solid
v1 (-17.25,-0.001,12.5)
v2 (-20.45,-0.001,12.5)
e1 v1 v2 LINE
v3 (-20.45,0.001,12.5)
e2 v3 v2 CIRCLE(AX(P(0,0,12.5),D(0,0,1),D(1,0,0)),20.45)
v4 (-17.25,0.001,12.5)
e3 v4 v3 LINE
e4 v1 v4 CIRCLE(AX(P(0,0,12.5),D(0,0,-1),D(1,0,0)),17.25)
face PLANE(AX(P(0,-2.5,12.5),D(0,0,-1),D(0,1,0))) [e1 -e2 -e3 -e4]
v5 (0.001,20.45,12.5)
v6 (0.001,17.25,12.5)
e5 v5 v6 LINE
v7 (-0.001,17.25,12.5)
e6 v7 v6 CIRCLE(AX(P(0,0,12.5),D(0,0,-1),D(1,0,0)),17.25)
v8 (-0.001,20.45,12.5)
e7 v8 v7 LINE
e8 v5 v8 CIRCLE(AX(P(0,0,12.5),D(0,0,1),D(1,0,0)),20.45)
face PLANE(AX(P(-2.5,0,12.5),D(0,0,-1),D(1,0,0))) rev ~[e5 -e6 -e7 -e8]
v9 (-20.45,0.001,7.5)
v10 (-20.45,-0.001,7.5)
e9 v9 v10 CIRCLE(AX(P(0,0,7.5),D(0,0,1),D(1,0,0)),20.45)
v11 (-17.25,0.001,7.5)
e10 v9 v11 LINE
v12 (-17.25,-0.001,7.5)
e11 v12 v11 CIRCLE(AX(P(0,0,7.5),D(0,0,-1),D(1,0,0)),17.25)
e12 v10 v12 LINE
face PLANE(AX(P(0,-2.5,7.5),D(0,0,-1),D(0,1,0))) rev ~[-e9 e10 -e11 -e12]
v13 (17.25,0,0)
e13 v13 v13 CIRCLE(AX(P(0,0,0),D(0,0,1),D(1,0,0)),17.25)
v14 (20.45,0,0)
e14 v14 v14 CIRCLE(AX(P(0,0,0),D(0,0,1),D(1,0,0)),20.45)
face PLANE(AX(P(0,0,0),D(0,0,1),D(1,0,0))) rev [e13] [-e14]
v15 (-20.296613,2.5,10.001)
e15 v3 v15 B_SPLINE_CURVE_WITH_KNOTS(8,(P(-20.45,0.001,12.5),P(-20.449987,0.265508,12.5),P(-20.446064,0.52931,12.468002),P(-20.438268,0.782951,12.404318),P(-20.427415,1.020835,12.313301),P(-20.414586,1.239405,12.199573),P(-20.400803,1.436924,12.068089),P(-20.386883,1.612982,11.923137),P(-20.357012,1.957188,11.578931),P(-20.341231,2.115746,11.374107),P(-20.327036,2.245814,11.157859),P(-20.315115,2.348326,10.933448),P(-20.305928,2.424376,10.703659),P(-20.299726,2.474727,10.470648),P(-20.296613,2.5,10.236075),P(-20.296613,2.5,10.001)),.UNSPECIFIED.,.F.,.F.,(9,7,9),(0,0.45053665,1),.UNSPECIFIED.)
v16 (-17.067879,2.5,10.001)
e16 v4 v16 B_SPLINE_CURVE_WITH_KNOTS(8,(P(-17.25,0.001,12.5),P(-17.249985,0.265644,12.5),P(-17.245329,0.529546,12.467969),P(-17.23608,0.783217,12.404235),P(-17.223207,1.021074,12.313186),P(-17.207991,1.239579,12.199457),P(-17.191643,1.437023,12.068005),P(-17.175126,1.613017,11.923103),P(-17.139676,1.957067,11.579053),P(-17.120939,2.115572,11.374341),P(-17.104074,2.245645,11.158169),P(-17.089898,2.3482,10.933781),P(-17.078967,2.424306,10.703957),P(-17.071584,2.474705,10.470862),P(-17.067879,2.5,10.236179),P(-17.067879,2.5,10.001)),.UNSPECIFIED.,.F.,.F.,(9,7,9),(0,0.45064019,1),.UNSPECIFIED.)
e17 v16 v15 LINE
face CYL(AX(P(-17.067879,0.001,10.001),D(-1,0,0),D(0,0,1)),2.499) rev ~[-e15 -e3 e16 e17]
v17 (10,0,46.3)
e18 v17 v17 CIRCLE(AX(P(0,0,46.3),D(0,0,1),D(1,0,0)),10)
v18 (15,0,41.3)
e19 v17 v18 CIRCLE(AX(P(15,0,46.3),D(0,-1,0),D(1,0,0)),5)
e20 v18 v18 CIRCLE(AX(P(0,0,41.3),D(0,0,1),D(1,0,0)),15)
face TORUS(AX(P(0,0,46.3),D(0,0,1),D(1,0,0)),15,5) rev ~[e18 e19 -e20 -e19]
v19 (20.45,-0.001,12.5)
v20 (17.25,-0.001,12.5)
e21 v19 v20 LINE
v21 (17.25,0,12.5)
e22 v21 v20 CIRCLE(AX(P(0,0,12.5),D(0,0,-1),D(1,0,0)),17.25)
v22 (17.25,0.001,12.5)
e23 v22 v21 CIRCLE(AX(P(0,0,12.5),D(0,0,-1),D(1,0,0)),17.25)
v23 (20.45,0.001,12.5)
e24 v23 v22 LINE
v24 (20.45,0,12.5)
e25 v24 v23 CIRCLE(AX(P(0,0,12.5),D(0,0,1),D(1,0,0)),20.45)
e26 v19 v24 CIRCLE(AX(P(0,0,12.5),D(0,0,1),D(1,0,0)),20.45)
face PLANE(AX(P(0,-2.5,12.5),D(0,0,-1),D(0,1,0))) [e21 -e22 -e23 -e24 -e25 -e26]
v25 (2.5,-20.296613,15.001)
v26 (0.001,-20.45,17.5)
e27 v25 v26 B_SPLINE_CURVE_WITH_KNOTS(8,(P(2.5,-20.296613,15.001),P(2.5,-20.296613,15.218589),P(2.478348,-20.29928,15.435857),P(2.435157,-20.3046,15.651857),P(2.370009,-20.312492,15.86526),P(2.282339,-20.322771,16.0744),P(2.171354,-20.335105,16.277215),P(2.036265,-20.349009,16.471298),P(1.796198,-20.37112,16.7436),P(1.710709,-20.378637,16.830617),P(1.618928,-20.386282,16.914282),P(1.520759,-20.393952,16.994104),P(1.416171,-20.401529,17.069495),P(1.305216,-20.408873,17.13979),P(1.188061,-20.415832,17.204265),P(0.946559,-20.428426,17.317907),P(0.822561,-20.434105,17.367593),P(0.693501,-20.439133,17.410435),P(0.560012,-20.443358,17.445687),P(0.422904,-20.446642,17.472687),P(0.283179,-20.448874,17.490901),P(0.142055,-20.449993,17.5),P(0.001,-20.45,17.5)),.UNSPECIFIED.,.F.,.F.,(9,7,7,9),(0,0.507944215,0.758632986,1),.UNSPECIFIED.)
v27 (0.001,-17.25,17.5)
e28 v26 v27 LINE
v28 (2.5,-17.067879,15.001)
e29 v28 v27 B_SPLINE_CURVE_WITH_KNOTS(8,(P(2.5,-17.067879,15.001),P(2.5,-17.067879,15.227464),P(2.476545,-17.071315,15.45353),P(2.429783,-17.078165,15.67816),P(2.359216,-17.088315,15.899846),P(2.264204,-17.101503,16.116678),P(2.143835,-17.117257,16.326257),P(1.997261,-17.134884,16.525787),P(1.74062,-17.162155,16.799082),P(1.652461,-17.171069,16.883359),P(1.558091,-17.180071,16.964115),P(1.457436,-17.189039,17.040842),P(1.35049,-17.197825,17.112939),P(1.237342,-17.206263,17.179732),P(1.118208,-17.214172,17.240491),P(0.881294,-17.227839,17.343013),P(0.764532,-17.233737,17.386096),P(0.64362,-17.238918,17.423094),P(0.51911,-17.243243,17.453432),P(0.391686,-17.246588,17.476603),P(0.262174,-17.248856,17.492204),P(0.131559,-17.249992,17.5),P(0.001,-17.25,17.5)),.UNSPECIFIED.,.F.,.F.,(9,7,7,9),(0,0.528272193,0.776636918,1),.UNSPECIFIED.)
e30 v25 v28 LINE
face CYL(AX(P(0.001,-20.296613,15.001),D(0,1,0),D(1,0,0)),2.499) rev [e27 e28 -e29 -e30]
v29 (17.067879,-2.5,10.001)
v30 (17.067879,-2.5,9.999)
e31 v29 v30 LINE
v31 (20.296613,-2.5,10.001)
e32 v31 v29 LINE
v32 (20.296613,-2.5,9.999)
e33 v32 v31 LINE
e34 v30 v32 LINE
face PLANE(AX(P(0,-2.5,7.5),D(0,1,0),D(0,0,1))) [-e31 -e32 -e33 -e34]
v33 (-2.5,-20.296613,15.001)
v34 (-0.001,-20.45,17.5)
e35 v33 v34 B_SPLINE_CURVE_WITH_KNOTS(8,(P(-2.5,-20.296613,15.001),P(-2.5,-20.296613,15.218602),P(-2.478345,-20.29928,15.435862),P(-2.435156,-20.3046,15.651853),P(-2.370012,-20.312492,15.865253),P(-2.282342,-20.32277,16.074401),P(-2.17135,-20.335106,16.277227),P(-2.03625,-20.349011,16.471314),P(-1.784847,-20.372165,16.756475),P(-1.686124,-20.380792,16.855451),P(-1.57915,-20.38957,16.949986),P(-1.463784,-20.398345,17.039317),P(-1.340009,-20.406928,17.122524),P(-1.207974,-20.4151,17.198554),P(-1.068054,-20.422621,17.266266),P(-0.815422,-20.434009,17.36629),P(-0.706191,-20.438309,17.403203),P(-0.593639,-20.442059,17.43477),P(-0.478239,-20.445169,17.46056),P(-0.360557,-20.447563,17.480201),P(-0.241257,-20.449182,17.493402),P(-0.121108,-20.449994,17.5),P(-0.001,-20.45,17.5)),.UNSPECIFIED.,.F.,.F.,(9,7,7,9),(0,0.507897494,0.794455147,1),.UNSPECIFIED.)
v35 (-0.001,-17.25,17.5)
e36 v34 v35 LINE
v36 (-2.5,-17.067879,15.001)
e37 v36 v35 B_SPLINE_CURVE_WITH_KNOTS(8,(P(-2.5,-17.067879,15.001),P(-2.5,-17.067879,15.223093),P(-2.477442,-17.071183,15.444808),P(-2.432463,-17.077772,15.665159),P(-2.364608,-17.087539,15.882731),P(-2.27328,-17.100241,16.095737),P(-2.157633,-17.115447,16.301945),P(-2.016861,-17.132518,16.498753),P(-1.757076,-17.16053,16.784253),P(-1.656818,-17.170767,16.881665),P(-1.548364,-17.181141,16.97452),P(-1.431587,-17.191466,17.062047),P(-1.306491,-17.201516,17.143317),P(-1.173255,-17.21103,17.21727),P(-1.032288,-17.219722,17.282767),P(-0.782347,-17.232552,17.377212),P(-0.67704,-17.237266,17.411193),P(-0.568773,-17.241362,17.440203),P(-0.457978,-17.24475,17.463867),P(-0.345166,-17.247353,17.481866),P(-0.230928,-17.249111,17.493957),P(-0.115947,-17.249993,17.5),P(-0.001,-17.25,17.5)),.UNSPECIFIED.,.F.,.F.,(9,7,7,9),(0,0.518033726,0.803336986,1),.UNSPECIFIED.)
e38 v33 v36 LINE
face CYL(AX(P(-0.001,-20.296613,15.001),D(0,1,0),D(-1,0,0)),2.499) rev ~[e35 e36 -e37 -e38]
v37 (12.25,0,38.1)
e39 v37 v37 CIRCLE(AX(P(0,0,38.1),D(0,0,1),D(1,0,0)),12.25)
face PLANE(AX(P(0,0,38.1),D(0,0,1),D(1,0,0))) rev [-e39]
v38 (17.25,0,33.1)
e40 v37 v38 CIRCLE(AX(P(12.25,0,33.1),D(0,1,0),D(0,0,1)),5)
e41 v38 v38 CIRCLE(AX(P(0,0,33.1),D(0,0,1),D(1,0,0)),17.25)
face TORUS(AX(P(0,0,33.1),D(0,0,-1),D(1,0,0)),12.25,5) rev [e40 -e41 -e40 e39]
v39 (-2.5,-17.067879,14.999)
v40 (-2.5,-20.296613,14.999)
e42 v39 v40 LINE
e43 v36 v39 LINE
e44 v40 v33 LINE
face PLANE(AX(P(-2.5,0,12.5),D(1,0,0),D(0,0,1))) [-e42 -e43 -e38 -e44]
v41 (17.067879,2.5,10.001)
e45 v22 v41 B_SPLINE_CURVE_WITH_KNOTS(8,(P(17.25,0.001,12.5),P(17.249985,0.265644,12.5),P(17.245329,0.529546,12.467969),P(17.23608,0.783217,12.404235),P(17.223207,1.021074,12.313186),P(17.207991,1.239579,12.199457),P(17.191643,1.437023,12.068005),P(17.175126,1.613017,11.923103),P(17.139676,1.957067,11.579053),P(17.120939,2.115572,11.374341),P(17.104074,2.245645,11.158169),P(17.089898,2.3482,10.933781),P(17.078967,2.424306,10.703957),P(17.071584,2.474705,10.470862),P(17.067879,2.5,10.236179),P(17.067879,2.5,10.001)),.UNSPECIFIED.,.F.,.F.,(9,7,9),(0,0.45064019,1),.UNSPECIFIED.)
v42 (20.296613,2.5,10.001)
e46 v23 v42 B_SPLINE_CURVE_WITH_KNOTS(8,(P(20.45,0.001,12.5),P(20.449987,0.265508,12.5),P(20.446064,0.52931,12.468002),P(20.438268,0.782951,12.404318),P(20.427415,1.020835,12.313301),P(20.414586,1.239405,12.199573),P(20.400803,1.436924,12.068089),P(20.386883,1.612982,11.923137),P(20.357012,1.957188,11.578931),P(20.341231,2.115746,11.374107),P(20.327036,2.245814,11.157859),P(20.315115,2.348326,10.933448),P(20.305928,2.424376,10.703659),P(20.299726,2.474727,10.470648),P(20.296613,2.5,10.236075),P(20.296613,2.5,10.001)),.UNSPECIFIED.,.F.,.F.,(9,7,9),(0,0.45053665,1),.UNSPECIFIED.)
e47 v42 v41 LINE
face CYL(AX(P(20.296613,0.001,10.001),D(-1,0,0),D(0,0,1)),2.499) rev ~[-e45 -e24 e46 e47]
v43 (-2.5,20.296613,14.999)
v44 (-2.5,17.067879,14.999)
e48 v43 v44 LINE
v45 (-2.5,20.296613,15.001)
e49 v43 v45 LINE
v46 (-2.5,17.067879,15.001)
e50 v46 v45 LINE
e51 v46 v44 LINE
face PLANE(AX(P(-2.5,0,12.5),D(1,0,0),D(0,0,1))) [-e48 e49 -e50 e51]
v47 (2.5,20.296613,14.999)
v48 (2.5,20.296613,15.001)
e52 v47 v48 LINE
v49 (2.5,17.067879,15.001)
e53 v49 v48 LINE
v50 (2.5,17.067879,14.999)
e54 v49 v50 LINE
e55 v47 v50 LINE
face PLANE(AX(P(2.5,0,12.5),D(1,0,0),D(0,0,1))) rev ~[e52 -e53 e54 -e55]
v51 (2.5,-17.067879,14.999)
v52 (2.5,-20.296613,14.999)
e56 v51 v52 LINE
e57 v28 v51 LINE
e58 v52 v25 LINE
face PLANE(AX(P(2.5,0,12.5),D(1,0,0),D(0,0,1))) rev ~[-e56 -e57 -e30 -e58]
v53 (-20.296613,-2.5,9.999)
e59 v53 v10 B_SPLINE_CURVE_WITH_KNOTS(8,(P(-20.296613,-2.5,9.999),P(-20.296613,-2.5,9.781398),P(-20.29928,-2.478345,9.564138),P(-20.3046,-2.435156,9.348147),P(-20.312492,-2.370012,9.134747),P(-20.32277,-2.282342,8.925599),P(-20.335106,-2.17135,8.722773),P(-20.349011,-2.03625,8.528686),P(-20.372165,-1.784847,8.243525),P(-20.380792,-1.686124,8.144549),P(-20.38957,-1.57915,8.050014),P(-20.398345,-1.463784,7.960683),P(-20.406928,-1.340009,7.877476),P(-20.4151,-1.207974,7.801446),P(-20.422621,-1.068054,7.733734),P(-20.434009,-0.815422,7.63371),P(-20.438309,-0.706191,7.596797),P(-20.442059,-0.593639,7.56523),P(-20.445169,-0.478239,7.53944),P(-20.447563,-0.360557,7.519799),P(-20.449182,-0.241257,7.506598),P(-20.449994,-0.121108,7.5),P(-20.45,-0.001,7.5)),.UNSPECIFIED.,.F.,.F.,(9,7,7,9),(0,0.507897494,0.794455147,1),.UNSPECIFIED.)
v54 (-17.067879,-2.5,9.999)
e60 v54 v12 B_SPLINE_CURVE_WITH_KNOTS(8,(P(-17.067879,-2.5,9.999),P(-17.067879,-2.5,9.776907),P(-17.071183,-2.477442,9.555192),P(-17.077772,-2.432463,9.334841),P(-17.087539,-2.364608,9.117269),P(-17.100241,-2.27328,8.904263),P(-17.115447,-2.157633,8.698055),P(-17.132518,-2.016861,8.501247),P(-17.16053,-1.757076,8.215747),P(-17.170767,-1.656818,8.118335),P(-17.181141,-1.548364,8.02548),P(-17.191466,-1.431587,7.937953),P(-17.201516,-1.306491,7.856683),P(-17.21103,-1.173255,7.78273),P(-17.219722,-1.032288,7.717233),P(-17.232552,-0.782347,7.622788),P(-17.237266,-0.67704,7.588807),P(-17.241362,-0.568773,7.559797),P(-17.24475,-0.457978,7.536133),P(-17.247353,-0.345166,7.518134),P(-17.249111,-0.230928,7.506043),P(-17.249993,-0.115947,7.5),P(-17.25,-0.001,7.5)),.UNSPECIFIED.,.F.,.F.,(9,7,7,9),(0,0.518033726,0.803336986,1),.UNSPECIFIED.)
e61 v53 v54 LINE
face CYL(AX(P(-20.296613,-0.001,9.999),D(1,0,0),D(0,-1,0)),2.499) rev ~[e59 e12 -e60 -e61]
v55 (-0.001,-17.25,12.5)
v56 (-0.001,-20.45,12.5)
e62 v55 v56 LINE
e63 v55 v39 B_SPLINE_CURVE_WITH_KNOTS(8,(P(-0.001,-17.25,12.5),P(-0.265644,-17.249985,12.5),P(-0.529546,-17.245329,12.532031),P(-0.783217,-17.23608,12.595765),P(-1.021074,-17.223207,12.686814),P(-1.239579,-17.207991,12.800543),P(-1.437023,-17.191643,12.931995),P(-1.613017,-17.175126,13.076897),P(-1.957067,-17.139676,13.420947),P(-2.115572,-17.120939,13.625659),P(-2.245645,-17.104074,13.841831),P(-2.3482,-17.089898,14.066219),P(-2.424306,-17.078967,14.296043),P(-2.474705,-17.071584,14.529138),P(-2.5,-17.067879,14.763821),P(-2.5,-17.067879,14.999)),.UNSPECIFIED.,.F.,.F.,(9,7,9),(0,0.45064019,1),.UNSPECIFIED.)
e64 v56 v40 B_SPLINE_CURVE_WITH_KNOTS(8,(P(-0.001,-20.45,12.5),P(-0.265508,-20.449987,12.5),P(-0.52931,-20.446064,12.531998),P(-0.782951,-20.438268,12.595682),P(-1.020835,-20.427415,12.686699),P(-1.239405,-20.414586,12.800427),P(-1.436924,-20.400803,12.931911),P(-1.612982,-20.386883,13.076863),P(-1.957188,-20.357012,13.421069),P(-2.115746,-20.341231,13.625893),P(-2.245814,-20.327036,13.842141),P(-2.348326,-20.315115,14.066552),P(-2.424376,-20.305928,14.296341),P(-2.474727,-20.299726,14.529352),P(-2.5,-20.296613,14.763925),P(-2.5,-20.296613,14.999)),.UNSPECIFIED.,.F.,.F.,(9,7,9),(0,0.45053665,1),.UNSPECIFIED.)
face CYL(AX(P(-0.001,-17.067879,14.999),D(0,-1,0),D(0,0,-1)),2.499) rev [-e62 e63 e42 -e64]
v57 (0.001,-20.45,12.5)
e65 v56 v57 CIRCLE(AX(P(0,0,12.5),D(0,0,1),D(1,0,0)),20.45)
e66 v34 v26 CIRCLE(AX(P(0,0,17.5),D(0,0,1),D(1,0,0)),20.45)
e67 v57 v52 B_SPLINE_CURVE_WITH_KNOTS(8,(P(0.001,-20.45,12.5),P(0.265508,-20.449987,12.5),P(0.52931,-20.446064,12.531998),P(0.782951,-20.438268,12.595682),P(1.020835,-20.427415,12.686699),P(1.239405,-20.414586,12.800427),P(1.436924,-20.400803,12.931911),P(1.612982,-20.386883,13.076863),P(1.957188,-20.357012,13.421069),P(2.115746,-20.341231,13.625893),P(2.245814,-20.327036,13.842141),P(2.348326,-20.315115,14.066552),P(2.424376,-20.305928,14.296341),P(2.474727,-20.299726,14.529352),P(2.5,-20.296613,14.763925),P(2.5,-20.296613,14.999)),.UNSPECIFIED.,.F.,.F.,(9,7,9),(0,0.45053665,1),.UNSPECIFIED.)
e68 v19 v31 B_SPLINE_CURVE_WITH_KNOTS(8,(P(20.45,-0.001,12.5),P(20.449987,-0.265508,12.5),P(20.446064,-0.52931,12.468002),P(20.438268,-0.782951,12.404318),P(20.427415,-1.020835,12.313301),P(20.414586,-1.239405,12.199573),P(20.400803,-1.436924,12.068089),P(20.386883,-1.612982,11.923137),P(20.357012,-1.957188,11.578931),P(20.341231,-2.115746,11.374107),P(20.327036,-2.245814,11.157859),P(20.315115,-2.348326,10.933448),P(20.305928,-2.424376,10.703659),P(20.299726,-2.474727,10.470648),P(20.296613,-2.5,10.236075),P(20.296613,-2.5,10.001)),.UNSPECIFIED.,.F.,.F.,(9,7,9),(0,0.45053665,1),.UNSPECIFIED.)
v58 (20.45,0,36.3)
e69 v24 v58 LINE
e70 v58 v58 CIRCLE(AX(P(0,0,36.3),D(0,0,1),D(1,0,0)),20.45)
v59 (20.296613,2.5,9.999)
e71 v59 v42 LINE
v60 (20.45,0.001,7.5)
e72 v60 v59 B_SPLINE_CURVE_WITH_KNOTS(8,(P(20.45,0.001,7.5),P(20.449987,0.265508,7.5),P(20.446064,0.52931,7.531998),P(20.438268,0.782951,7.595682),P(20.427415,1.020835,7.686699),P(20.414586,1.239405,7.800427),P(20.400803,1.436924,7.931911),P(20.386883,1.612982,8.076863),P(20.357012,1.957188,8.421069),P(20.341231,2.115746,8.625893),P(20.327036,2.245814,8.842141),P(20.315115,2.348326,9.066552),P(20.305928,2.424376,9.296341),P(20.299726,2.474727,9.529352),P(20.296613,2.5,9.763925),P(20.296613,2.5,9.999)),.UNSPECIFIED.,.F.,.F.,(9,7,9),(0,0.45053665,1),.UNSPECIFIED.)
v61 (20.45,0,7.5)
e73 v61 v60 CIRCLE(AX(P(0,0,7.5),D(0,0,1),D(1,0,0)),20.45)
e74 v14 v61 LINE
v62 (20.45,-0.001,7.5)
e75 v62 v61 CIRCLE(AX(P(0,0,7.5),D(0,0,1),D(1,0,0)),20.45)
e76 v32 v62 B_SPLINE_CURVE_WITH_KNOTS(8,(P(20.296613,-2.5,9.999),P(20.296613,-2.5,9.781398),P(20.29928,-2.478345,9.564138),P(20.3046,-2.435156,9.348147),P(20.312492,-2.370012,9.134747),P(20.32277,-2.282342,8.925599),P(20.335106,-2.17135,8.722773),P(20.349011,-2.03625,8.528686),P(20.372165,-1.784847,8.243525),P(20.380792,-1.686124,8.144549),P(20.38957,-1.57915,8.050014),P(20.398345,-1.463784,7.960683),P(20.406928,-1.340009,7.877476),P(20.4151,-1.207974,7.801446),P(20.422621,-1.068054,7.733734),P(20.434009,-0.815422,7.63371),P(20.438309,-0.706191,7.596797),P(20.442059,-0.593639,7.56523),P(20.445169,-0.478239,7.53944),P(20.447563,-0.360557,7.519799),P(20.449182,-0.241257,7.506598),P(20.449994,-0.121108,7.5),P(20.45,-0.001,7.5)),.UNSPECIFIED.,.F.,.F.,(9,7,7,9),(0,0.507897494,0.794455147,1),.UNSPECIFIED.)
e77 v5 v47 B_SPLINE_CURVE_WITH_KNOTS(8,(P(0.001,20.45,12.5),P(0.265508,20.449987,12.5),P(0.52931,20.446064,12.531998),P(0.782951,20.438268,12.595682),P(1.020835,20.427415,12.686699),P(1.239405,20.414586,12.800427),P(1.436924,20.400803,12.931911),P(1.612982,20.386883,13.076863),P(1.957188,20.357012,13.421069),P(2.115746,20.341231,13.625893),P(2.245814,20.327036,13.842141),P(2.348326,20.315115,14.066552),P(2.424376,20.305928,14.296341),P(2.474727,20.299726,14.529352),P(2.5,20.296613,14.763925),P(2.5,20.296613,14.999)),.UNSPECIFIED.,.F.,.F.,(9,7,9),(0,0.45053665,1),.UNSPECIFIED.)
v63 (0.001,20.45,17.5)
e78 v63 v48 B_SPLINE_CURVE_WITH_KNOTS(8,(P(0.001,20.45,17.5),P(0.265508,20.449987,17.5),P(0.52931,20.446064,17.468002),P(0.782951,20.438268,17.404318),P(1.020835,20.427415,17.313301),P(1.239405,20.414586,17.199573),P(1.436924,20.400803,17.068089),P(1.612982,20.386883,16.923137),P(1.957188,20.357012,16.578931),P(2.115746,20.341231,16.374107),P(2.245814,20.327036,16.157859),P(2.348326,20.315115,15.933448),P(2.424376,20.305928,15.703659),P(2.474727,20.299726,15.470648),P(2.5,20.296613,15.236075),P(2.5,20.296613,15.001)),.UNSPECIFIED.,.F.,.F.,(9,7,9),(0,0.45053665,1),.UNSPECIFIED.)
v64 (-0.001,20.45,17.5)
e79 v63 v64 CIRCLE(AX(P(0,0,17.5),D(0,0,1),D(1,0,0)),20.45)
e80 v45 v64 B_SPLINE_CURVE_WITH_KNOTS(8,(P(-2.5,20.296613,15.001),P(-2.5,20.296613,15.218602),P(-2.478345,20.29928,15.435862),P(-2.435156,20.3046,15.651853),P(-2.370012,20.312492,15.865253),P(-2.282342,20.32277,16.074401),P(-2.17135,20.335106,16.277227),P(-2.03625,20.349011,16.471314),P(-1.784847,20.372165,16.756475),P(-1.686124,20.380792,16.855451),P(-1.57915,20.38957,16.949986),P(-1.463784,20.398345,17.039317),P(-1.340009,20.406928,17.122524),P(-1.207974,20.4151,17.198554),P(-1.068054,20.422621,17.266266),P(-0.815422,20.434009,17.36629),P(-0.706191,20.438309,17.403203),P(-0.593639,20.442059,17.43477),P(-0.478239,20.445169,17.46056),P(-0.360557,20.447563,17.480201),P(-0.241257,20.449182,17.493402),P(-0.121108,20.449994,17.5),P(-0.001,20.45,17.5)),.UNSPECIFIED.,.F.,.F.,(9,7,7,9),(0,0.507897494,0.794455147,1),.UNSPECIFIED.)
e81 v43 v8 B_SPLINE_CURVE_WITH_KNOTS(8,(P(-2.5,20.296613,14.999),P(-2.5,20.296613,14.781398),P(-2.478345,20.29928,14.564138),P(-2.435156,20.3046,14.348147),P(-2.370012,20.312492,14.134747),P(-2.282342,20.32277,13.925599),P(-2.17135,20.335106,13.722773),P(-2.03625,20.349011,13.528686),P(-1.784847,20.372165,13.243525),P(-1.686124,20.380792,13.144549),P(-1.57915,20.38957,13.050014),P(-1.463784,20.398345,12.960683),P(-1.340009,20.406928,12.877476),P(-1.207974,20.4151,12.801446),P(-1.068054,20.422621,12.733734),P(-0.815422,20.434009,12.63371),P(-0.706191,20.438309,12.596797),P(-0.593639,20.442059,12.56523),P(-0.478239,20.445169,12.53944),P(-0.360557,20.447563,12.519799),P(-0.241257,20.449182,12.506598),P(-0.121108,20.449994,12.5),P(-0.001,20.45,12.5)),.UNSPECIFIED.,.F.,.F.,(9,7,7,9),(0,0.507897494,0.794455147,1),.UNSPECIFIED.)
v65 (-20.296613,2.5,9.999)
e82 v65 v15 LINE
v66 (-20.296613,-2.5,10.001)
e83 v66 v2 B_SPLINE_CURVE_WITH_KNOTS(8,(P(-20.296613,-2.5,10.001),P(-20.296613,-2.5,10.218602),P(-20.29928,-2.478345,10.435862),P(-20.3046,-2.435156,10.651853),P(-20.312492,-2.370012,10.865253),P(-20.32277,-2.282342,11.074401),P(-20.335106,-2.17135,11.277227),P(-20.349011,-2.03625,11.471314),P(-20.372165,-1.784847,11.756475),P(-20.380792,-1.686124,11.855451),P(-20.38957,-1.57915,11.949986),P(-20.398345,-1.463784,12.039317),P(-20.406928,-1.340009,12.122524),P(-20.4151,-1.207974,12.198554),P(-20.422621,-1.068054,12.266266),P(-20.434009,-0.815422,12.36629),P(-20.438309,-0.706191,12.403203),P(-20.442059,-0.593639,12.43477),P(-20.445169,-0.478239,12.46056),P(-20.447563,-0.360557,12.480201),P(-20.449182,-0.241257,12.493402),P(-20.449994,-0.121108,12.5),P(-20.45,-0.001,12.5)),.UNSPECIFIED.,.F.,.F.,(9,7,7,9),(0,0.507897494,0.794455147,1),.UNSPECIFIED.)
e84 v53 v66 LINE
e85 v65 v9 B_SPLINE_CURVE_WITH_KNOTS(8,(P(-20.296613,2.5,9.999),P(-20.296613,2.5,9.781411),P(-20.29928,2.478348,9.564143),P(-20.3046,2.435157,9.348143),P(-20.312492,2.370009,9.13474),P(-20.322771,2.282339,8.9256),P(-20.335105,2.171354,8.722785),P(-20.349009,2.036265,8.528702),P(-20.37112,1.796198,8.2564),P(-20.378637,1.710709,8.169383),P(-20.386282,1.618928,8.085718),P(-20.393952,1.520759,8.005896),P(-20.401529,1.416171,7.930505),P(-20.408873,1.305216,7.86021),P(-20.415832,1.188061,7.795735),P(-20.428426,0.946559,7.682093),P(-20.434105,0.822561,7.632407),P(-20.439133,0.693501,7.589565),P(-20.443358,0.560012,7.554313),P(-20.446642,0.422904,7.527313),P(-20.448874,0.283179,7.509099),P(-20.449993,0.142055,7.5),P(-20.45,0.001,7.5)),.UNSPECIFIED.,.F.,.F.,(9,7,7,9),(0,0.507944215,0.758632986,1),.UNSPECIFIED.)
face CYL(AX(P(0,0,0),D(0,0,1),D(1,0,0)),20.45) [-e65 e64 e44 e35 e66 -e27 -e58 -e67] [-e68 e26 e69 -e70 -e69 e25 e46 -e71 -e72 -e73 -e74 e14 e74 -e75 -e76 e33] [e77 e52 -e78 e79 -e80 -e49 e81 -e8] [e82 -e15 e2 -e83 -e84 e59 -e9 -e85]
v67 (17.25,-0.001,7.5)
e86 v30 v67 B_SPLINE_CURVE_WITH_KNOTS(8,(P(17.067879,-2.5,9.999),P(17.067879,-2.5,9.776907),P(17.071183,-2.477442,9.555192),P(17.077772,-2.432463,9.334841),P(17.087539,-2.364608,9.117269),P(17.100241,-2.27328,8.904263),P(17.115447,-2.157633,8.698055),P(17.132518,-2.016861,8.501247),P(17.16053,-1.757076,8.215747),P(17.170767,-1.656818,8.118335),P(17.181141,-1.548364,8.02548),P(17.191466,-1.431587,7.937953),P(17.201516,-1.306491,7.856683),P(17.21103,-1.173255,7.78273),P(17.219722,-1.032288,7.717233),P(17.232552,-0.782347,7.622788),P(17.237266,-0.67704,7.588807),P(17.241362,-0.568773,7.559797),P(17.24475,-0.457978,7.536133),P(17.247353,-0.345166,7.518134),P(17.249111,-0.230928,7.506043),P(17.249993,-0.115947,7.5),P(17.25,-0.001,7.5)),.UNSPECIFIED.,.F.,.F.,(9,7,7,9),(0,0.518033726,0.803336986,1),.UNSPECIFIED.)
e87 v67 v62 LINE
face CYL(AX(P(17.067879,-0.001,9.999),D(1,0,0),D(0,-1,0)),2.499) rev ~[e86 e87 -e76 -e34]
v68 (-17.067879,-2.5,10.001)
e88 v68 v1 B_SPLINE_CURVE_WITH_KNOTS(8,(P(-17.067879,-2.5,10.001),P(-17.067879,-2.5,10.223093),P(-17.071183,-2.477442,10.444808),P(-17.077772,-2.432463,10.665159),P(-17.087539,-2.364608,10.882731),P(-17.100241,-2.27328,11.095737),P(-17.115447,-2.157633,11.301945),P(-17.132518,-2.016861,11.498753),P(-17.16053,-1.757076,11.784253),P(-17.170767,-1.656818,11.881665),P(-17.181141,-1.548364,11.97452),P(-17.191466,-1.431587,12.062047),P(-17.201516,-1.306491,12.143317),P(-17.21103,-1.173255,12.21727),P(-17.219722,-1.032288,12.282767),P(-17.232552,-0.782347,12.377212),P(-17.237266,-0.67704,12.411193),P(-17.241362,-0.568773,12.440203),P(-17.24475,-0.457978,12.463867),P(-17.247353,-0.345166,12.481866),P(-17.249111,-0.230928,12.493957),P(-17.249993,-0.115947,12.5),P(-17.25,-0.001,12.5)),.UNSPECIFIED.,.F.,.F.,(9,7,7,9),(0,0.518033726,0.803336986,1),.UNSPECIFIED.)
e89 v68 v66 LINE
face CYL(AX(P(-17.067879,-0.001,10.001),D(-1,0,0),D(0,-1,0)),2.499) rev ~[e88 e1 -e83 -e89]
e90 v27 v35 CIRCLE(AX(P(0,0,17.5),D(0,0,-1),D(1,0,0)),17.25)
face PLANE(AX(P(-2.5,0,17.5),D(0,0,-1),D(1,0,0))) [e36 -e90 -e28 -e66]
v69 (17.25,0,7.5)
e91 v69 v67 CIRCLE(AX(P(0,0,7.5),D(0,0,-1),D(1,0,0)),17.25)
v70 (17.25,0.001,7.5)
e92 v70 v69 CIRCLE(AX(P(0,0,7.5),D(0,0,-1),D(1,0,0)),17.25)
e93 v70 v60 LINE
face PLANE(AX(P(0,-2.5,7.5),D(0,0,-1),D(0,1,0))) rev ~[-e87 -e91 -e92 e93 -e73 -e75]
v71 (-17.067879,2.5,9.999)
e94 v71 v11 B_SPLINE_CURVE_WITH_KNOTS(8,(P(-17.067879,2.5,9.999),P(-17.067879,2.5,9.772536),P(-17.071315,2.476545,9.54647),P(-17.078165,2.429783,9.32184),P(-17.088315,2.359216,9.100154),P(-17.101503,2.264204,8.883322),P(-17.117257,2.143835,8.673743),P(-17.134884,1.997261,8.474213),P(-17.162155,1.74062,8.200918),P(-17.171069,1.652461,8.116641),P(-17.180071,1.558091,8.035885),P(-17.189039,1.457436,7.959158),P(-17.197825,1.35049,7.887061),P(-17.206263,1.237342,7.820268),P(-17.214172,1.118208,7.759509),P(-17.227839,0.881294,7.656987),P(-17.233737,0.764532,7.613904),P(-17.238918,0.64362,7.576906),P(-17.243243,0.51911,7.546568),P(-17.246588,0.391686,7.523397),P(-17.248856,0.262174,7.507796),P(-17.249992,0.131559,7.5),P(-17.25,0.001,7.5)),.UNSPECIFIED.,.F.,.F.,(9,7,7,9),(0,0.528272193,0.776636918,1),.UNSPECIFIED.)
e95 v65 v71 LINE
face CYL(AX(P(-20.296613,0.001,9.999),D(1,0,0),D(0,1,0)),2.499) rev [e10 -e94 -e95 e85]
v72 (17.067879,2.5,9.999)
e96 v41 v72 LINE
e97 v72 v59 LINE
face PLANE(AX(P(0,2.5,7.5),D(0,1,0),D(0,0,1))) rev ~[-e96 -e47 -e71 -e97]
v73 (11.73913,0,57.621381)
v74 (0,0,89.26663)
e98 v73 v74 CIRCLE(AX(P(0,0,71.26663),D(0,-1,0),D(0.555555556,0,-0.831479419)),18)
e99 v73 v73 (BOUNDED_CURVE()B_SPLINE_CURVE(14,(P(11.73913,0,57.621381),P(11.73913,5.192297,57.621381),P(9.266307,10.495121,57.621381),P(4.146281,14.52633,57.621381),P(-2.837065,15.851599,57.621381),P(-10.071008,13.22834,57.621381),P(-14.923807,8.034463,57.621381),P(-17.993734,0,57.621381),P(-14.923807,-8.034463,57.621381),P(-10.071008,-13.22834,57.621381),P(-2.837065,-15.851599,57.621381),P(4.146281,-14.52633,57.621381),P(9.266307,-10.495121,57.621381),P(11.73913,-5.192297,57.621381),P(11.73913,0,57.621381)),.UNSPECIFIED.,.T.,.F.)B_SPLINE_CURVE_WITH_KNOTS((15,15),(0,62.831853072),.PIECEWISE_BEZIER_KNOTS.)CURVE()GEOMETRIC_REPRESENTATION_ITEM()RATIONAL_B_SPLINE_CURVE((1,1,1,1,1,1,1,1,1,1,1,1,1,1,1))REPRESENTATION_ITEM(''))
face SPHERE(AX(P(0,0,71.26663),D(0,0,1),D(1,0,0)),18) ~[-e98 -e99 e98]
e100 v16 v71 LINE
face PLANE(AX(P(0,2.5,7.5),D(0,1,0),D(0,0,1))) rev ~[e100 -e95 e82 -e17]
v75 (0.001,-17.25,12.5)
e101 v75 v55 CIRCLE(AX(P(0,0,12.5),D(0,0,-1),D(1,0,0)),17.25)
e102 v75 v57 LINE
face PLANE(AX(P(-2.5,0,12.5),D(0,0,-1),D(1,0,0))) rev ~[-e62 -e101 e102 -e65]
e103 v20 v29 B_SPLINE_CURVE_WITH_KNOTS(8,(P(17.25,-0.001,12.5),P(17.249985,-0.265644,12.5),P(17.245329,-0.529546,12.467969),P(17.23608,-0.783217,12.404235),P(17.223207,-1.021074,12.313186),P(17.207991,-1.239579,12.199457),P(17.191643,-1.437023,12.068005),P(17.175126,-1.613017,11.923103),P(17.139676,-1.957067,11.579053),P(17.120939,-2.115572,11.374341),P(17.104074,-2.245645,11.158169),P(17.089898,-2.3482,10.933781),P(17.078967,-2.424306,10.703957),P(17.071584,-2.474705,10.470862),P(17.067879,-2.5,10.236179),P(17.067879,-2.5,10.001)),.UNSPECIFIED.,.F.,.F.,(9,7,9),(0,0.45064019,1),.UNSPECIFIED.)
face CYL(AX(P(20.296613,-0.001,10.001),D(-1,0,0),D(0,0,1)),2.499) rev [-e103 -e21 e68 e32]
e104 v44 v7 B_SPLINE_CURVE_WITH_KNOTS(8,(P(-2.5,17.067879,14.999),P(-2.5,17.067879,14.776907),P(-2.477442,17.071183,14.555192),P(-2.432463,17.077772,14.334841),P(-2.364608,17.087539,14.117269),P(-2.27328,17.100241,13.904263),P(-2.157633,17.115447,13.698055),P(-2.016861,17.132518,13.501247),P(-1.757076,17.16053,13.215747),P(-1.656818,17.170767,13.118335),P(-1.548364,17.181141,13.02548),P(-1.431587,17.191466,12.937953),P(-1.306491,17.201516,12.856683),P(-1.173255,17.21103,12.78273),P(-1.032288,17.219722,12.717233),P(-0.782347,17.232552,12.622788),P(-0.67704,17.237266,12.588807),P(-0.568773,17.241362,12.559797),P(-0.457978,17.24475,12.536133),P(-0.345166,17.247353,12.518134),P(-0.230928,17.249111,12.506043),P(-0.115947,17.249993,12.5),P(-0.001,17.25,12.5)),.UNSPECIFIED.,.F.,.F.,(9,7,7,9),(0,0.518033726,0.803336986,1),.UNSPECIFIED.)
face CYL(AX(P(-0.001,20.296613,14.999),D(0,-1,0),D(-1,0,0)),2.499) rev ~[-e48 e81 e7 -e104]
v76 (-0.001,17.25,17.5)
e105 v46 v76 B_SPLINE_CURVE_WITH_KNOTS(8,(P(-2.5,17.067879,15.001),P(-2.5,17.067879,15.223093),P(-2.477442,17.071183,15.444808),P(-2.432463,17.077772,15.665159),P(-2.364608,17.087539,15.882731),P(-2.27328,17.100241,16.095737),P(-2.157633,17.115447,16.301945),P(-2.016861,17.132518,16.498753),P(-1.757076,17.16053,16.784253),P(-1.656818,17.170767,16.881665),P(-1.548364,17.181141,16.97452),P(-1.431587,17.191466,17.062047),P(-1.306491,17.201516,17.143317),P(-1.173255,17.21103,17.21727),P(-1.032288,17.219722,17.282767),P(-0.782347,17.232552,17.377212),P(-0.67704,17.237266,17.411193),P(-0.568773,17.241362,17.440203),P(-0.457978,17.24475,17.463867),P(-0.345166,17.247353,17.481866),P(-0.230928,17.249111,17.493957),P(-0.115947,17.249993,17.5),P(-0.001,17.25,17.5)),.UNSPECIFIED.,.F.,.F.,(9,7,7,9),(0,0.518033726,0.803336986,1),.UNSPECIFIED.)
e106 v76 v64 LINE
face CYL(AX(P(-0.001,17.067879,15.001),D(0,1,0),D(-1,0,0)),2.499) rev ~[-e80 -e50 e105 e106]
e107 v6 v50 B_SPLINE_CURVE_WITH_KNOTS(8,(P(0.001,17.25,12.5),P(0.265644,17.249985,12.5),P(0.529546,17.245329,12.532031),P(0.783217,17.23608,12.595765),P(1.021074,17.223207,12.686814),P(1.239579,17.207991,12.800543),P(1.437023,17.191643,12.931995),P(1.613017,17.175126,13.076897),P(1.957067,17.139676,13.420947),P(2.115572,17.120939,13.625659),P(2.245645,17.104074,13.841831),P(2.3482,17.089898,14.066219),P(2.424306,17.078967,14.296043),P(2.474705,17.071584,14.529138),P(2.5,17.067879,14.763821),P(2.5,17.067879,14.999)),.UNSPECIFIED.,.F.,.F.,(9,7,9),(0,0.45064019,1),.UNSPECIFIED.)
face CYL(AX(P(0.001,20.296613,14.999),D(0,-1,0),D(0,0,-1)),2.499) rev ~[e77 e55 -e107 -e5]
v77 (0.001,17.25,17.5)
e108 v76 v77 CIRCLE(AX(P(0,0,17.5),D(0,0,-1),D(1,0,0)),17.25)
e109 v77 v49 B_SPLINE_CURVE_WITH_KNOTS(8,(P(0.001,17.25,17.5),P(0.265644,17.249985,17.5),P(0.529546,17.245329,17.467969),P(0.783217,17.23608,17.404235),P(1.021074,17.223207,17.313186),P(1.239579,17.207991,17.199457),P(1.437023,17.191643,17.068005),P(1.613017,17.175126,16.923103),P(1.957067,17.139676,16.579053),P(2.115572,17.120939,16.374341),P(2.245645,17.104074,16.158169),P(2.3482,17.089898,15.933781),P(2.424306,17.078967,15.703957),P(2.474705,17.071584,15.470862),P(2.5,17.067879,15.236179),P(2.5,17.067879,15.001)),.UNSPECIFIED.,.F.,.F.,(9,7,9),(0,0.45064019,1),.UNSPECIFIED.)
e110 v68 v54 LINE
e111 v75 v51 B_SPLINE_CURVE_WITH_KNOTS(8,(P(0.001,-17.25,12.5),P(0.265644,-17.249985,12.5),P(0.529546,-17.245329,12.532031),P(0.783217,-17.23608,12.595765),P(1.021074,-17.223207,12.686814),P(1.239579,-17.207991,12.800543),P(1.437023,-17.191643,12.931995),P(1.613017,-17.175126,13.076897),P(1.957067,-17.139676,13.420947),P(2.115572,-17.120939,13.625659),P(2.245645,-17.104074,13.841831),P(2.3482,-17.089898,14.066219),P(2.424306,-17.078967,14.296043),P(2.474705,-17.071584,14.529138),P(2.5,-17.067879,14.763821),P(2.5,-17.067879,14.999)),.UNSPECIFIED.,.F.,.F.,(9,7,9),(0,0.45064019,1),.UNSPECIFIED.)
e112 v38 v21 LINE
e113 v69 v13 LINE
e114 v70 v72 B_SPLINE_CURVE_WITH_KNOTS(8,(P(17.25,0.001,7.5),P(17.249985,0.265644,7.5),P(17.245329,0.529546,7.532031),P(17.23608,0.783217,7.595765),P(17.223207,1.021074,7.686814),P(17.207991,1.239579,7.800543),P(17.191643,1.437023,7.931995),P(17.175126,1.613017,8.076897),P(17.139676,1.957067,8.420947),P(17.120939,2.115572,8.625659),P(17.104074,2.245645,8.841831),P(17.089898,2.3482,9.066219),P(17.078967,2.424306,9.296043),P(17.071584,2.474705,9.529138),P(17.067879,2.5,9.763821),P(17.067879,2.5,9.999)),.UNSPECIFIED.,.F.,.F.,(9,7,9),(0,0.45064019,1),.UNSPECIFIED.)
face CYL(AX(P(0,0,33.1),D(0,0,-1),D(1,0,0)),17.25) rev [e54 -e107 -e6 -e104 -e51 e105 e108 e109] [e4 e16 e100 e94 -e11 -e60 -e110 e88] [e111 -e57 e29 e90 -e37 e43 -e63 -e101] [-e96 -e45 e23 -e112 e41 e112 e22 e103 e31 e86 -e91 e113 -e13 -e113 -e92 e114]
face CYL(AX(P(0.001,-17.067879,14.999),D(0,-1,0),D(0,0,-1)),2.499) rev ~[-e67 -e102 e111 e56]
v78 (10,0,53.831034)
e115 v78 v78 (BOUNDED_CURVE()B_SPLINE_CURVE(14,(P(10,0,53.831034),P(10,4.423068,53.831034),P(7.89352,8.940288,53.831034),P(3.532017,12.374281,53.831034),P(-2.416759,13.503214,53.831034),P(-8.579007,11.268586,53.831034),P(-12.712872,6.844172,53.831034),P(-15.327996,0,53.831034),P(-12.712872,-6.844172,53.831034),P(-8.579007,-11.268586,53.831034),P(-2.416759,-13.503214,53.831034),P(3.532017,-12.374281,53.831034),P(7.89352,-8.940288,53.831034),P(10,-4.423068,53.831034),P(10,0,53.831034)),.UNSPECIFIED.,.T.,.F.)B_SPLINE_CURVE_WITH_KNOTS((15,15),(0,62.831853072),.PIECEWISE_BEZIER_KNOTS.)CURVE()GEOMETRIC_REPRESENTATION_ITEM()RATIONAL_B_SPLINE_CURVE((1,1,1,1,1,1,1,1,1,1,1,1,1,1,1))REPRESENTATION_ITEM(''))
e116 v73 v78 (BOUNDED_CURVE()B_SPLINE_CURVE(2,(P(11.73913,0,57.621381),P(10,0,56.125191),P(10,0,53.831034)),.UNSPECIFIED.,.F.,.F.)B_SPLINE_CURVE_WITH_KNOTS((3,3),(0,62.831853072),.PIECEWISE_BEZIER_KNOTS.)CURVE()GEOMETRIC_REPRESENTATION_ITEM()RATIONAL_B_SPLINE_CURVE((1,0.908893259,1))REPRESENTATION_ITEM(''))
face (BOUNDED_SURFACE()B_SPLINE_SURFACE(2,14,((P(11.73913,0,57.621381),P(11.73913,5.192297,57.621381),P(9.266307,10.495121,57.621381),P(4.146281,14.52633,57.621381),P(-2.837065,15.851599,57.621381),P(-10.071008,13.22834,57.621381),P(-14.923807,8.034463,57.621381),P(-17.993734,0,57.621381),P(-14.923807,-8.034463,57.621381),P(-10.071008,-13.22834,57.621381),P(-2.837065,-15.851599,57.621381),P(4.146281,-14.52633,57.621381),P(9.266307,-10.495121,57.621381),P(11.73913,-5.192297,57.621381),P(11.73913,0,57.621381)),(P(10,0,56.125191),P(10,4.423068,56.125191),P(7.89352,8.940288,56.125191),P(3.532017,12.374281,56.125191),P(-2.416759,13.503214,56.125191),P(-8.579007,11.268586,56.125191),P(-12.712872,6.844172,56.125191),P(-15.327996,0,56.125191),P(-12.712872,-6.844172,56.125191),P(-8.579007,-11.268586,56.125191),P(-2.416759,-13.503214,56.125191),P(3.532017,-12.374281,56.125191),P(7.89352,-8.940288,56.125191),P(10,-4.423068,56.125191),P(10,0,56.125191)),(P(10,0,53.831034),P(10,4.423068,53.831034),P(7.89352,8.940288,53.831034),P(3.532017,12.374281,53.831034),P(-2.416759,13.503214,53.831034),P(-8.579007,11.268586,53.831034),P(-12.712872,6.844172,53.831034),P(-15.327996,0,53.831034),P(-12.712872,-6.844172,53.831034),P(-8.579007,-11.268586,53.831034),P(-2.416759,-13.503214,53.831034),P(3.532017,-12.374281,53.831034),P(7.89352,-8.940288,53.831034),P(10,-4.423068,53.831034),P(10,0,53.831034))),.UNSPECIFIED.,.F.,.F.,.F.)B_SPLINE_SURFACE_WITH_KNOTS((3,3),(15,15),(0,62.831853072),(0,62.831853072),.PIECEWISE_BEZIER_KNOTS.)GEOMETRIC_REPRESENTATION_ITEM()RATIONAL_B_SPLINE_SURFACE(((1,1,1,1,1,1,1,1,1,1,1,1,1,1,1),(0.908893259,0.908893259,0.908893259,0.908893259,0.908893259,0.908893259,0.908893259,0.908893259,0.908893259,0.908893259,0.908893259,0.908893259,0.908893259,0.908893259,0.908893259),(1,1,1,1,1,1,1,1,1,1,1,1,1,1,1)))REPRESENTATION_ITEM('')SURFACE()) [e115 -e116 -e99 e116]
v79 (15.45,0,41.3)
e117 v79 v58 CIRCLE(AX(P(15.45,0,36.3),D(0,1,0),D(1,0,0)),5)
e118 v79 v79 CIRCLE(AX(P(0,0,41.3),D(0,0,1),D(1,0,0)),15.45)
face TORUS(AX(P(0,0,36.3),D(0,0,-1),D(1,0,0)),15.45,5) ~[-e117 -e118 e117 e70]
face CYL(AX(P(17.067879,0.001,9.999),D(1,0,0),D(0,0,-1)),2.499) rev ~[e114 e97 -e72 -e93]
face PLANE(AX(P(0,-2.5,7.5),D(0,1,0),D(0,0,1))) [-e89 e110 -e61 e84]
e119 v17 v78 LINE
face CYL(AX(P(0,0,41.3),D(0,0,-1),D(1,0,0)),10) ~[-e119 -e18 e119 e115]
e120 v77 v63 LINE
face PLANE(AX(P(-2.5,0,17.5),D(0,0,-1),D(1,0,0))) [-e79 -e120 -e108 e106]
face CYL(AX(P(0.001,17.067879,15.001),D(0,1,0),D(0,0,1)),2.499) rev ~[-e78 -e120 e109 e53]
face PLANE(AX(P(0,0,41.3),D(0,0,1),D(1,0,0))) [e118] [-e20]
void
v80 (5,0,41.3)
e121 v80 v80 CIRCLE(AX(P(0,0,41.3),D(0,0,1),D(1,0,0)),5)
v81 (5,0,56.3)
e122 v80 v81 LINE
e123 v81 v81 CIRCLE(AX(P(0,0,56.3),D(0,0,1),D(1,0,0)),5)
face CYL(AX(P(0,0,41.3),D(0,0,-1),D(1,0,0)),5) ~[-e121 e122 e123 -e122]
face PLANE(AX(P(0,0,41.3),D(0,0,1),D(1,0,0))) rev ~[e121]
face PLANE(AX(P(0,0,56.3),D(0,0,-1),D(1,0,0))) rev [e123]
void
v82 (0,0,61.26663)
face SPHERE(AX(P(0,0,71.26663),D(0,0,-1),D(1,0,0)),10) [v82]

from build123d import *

# Parameters (mm, degrees)
F2_R      = 10
F2_R_2    = 5
F3_DEPTH  = 15
F6_R      = 5
F7_W      = 5
F7_H      = 5
F8_DEPTH  = 25
F9_W      = 5
F9_H      = 5
F10_DEPTH = 25
F11_R     = 2.499


# Not quite as in the source:
# - a fillet or chamfer is up to 0.001 mm smaller than in the source, because OpenCascade refuses the exact size


with BuildPart() as f1:
    # F0 (on Front) → F1 (revolve)
    with BuildSketch(Plane.XZ):
        with BuildLine():
            Line((17.25, 33.1), (17.25, 0))
            Line((17.25, 0), (20.45, 0))
            Line((20.45, 0), (20.45, 41.3))
            Line((20.45, 41.3), (0, 41.3))
            Line((0, 41.3), (0, 38.1))
            Line((0, 38.1), (12.25, 38.1))
            ThreePointArc((12.25, 38.1), (15.7855339059, 36.6355339059), (17.25, 33.1))
        make_face()
    revolve(axis=Axis((0, 0, 39.7), (0, 0, 1)))

    # F2 (on face) → F3 (join)
    with BuildSketch(Plane.XY.offset(41.3)):
        Circle(F2_R)
        Circle(F2_R_2, mode=Mode.SUBTRACT)
    extrude(amount=F3_DEPTH)

    # F4 (on Front) → F5 (revolve)
    with BuildSketch(Plane.XZ):
        with BuildLine():
            Line((0, 56.3), (10, 56.3))
            ThreePointArc((10, 56.3), (17.2249721603, 76.4916017074), (0, 89.2666295471))
            Line((0, 89.2666295471), (0, 81.2666295471))
            ThreePointArc((0, 81.2666295471), (10, 71.2666295471), (0, 61.2666295471))
            Line((0, 61.2666295471), (0, 56.3))
        make_face()
    revolve(axis=Axis((0, 0, 85.2666295471), (0, 0, -1)))

    # F6
    f6_edges = [f1.edges().sort_by_distance(p)[0] for p in [
        (-10, 0, 56.3),
        (-20.45, 0, 41.3),
        (-10, 0, 41.3),
    ]]
    fillet(f6_edges, radius=F6_R)

    # F7 (on Front) → F8 (cut, symmetric)
    with BuildSketch(Plane.XZ):
        with Locations((0, 15)):
            Rectangle(F7_W, F7_H)
    extrude(amount=F8_DEPTH, both=True, mode=Mode.SUBTRACT)

    # F9 (on Right) → F10 (cut, symmetric)
    with BuildSketch(Plane.YZ):
        with Locations((0, 10)):
            Rectangle(F9_W, F9_H)
    extrude(amount=F10_DEPTH, both=True, mode=Mode.SUBTRACT)

    # F11 (radius 2.5 in the source; OpenCascade refuses exactly that, so slightly less here)
    f11_edges = [f1.edges().sort_by_distance(p)[0] for p in [
        (18.682246, -2.5, 12.5),
        (-18.682246, -2.5, 12.5),
        (18.682246, -2.5, 7.5),
        (-18.682246, -2.5, 7.5),
        (18.682246, 2.5, 7.5),
        (-18.682246, 2.5, 7.5),
        (18.682246, 2.5, 12.5),
        (-18.682246, 2.5, 12.5),
        (-2.5, 18.682246, 17.5),
        (-2.5, -18.682246, 17.5),
        (-2.5, 18.682246, 12.5),
        (-2.5, -18.682246, 12.5),
        (2.5, 18.682246, 12.5),
        (2.5, -18.682246, 12.5),
        (2.5, 18.682246, 17.5),
        (2.5, -18.682246, 17.5),
    ]]
    fillet(f11_edges, radius=F11_R)


solid = f1.part
